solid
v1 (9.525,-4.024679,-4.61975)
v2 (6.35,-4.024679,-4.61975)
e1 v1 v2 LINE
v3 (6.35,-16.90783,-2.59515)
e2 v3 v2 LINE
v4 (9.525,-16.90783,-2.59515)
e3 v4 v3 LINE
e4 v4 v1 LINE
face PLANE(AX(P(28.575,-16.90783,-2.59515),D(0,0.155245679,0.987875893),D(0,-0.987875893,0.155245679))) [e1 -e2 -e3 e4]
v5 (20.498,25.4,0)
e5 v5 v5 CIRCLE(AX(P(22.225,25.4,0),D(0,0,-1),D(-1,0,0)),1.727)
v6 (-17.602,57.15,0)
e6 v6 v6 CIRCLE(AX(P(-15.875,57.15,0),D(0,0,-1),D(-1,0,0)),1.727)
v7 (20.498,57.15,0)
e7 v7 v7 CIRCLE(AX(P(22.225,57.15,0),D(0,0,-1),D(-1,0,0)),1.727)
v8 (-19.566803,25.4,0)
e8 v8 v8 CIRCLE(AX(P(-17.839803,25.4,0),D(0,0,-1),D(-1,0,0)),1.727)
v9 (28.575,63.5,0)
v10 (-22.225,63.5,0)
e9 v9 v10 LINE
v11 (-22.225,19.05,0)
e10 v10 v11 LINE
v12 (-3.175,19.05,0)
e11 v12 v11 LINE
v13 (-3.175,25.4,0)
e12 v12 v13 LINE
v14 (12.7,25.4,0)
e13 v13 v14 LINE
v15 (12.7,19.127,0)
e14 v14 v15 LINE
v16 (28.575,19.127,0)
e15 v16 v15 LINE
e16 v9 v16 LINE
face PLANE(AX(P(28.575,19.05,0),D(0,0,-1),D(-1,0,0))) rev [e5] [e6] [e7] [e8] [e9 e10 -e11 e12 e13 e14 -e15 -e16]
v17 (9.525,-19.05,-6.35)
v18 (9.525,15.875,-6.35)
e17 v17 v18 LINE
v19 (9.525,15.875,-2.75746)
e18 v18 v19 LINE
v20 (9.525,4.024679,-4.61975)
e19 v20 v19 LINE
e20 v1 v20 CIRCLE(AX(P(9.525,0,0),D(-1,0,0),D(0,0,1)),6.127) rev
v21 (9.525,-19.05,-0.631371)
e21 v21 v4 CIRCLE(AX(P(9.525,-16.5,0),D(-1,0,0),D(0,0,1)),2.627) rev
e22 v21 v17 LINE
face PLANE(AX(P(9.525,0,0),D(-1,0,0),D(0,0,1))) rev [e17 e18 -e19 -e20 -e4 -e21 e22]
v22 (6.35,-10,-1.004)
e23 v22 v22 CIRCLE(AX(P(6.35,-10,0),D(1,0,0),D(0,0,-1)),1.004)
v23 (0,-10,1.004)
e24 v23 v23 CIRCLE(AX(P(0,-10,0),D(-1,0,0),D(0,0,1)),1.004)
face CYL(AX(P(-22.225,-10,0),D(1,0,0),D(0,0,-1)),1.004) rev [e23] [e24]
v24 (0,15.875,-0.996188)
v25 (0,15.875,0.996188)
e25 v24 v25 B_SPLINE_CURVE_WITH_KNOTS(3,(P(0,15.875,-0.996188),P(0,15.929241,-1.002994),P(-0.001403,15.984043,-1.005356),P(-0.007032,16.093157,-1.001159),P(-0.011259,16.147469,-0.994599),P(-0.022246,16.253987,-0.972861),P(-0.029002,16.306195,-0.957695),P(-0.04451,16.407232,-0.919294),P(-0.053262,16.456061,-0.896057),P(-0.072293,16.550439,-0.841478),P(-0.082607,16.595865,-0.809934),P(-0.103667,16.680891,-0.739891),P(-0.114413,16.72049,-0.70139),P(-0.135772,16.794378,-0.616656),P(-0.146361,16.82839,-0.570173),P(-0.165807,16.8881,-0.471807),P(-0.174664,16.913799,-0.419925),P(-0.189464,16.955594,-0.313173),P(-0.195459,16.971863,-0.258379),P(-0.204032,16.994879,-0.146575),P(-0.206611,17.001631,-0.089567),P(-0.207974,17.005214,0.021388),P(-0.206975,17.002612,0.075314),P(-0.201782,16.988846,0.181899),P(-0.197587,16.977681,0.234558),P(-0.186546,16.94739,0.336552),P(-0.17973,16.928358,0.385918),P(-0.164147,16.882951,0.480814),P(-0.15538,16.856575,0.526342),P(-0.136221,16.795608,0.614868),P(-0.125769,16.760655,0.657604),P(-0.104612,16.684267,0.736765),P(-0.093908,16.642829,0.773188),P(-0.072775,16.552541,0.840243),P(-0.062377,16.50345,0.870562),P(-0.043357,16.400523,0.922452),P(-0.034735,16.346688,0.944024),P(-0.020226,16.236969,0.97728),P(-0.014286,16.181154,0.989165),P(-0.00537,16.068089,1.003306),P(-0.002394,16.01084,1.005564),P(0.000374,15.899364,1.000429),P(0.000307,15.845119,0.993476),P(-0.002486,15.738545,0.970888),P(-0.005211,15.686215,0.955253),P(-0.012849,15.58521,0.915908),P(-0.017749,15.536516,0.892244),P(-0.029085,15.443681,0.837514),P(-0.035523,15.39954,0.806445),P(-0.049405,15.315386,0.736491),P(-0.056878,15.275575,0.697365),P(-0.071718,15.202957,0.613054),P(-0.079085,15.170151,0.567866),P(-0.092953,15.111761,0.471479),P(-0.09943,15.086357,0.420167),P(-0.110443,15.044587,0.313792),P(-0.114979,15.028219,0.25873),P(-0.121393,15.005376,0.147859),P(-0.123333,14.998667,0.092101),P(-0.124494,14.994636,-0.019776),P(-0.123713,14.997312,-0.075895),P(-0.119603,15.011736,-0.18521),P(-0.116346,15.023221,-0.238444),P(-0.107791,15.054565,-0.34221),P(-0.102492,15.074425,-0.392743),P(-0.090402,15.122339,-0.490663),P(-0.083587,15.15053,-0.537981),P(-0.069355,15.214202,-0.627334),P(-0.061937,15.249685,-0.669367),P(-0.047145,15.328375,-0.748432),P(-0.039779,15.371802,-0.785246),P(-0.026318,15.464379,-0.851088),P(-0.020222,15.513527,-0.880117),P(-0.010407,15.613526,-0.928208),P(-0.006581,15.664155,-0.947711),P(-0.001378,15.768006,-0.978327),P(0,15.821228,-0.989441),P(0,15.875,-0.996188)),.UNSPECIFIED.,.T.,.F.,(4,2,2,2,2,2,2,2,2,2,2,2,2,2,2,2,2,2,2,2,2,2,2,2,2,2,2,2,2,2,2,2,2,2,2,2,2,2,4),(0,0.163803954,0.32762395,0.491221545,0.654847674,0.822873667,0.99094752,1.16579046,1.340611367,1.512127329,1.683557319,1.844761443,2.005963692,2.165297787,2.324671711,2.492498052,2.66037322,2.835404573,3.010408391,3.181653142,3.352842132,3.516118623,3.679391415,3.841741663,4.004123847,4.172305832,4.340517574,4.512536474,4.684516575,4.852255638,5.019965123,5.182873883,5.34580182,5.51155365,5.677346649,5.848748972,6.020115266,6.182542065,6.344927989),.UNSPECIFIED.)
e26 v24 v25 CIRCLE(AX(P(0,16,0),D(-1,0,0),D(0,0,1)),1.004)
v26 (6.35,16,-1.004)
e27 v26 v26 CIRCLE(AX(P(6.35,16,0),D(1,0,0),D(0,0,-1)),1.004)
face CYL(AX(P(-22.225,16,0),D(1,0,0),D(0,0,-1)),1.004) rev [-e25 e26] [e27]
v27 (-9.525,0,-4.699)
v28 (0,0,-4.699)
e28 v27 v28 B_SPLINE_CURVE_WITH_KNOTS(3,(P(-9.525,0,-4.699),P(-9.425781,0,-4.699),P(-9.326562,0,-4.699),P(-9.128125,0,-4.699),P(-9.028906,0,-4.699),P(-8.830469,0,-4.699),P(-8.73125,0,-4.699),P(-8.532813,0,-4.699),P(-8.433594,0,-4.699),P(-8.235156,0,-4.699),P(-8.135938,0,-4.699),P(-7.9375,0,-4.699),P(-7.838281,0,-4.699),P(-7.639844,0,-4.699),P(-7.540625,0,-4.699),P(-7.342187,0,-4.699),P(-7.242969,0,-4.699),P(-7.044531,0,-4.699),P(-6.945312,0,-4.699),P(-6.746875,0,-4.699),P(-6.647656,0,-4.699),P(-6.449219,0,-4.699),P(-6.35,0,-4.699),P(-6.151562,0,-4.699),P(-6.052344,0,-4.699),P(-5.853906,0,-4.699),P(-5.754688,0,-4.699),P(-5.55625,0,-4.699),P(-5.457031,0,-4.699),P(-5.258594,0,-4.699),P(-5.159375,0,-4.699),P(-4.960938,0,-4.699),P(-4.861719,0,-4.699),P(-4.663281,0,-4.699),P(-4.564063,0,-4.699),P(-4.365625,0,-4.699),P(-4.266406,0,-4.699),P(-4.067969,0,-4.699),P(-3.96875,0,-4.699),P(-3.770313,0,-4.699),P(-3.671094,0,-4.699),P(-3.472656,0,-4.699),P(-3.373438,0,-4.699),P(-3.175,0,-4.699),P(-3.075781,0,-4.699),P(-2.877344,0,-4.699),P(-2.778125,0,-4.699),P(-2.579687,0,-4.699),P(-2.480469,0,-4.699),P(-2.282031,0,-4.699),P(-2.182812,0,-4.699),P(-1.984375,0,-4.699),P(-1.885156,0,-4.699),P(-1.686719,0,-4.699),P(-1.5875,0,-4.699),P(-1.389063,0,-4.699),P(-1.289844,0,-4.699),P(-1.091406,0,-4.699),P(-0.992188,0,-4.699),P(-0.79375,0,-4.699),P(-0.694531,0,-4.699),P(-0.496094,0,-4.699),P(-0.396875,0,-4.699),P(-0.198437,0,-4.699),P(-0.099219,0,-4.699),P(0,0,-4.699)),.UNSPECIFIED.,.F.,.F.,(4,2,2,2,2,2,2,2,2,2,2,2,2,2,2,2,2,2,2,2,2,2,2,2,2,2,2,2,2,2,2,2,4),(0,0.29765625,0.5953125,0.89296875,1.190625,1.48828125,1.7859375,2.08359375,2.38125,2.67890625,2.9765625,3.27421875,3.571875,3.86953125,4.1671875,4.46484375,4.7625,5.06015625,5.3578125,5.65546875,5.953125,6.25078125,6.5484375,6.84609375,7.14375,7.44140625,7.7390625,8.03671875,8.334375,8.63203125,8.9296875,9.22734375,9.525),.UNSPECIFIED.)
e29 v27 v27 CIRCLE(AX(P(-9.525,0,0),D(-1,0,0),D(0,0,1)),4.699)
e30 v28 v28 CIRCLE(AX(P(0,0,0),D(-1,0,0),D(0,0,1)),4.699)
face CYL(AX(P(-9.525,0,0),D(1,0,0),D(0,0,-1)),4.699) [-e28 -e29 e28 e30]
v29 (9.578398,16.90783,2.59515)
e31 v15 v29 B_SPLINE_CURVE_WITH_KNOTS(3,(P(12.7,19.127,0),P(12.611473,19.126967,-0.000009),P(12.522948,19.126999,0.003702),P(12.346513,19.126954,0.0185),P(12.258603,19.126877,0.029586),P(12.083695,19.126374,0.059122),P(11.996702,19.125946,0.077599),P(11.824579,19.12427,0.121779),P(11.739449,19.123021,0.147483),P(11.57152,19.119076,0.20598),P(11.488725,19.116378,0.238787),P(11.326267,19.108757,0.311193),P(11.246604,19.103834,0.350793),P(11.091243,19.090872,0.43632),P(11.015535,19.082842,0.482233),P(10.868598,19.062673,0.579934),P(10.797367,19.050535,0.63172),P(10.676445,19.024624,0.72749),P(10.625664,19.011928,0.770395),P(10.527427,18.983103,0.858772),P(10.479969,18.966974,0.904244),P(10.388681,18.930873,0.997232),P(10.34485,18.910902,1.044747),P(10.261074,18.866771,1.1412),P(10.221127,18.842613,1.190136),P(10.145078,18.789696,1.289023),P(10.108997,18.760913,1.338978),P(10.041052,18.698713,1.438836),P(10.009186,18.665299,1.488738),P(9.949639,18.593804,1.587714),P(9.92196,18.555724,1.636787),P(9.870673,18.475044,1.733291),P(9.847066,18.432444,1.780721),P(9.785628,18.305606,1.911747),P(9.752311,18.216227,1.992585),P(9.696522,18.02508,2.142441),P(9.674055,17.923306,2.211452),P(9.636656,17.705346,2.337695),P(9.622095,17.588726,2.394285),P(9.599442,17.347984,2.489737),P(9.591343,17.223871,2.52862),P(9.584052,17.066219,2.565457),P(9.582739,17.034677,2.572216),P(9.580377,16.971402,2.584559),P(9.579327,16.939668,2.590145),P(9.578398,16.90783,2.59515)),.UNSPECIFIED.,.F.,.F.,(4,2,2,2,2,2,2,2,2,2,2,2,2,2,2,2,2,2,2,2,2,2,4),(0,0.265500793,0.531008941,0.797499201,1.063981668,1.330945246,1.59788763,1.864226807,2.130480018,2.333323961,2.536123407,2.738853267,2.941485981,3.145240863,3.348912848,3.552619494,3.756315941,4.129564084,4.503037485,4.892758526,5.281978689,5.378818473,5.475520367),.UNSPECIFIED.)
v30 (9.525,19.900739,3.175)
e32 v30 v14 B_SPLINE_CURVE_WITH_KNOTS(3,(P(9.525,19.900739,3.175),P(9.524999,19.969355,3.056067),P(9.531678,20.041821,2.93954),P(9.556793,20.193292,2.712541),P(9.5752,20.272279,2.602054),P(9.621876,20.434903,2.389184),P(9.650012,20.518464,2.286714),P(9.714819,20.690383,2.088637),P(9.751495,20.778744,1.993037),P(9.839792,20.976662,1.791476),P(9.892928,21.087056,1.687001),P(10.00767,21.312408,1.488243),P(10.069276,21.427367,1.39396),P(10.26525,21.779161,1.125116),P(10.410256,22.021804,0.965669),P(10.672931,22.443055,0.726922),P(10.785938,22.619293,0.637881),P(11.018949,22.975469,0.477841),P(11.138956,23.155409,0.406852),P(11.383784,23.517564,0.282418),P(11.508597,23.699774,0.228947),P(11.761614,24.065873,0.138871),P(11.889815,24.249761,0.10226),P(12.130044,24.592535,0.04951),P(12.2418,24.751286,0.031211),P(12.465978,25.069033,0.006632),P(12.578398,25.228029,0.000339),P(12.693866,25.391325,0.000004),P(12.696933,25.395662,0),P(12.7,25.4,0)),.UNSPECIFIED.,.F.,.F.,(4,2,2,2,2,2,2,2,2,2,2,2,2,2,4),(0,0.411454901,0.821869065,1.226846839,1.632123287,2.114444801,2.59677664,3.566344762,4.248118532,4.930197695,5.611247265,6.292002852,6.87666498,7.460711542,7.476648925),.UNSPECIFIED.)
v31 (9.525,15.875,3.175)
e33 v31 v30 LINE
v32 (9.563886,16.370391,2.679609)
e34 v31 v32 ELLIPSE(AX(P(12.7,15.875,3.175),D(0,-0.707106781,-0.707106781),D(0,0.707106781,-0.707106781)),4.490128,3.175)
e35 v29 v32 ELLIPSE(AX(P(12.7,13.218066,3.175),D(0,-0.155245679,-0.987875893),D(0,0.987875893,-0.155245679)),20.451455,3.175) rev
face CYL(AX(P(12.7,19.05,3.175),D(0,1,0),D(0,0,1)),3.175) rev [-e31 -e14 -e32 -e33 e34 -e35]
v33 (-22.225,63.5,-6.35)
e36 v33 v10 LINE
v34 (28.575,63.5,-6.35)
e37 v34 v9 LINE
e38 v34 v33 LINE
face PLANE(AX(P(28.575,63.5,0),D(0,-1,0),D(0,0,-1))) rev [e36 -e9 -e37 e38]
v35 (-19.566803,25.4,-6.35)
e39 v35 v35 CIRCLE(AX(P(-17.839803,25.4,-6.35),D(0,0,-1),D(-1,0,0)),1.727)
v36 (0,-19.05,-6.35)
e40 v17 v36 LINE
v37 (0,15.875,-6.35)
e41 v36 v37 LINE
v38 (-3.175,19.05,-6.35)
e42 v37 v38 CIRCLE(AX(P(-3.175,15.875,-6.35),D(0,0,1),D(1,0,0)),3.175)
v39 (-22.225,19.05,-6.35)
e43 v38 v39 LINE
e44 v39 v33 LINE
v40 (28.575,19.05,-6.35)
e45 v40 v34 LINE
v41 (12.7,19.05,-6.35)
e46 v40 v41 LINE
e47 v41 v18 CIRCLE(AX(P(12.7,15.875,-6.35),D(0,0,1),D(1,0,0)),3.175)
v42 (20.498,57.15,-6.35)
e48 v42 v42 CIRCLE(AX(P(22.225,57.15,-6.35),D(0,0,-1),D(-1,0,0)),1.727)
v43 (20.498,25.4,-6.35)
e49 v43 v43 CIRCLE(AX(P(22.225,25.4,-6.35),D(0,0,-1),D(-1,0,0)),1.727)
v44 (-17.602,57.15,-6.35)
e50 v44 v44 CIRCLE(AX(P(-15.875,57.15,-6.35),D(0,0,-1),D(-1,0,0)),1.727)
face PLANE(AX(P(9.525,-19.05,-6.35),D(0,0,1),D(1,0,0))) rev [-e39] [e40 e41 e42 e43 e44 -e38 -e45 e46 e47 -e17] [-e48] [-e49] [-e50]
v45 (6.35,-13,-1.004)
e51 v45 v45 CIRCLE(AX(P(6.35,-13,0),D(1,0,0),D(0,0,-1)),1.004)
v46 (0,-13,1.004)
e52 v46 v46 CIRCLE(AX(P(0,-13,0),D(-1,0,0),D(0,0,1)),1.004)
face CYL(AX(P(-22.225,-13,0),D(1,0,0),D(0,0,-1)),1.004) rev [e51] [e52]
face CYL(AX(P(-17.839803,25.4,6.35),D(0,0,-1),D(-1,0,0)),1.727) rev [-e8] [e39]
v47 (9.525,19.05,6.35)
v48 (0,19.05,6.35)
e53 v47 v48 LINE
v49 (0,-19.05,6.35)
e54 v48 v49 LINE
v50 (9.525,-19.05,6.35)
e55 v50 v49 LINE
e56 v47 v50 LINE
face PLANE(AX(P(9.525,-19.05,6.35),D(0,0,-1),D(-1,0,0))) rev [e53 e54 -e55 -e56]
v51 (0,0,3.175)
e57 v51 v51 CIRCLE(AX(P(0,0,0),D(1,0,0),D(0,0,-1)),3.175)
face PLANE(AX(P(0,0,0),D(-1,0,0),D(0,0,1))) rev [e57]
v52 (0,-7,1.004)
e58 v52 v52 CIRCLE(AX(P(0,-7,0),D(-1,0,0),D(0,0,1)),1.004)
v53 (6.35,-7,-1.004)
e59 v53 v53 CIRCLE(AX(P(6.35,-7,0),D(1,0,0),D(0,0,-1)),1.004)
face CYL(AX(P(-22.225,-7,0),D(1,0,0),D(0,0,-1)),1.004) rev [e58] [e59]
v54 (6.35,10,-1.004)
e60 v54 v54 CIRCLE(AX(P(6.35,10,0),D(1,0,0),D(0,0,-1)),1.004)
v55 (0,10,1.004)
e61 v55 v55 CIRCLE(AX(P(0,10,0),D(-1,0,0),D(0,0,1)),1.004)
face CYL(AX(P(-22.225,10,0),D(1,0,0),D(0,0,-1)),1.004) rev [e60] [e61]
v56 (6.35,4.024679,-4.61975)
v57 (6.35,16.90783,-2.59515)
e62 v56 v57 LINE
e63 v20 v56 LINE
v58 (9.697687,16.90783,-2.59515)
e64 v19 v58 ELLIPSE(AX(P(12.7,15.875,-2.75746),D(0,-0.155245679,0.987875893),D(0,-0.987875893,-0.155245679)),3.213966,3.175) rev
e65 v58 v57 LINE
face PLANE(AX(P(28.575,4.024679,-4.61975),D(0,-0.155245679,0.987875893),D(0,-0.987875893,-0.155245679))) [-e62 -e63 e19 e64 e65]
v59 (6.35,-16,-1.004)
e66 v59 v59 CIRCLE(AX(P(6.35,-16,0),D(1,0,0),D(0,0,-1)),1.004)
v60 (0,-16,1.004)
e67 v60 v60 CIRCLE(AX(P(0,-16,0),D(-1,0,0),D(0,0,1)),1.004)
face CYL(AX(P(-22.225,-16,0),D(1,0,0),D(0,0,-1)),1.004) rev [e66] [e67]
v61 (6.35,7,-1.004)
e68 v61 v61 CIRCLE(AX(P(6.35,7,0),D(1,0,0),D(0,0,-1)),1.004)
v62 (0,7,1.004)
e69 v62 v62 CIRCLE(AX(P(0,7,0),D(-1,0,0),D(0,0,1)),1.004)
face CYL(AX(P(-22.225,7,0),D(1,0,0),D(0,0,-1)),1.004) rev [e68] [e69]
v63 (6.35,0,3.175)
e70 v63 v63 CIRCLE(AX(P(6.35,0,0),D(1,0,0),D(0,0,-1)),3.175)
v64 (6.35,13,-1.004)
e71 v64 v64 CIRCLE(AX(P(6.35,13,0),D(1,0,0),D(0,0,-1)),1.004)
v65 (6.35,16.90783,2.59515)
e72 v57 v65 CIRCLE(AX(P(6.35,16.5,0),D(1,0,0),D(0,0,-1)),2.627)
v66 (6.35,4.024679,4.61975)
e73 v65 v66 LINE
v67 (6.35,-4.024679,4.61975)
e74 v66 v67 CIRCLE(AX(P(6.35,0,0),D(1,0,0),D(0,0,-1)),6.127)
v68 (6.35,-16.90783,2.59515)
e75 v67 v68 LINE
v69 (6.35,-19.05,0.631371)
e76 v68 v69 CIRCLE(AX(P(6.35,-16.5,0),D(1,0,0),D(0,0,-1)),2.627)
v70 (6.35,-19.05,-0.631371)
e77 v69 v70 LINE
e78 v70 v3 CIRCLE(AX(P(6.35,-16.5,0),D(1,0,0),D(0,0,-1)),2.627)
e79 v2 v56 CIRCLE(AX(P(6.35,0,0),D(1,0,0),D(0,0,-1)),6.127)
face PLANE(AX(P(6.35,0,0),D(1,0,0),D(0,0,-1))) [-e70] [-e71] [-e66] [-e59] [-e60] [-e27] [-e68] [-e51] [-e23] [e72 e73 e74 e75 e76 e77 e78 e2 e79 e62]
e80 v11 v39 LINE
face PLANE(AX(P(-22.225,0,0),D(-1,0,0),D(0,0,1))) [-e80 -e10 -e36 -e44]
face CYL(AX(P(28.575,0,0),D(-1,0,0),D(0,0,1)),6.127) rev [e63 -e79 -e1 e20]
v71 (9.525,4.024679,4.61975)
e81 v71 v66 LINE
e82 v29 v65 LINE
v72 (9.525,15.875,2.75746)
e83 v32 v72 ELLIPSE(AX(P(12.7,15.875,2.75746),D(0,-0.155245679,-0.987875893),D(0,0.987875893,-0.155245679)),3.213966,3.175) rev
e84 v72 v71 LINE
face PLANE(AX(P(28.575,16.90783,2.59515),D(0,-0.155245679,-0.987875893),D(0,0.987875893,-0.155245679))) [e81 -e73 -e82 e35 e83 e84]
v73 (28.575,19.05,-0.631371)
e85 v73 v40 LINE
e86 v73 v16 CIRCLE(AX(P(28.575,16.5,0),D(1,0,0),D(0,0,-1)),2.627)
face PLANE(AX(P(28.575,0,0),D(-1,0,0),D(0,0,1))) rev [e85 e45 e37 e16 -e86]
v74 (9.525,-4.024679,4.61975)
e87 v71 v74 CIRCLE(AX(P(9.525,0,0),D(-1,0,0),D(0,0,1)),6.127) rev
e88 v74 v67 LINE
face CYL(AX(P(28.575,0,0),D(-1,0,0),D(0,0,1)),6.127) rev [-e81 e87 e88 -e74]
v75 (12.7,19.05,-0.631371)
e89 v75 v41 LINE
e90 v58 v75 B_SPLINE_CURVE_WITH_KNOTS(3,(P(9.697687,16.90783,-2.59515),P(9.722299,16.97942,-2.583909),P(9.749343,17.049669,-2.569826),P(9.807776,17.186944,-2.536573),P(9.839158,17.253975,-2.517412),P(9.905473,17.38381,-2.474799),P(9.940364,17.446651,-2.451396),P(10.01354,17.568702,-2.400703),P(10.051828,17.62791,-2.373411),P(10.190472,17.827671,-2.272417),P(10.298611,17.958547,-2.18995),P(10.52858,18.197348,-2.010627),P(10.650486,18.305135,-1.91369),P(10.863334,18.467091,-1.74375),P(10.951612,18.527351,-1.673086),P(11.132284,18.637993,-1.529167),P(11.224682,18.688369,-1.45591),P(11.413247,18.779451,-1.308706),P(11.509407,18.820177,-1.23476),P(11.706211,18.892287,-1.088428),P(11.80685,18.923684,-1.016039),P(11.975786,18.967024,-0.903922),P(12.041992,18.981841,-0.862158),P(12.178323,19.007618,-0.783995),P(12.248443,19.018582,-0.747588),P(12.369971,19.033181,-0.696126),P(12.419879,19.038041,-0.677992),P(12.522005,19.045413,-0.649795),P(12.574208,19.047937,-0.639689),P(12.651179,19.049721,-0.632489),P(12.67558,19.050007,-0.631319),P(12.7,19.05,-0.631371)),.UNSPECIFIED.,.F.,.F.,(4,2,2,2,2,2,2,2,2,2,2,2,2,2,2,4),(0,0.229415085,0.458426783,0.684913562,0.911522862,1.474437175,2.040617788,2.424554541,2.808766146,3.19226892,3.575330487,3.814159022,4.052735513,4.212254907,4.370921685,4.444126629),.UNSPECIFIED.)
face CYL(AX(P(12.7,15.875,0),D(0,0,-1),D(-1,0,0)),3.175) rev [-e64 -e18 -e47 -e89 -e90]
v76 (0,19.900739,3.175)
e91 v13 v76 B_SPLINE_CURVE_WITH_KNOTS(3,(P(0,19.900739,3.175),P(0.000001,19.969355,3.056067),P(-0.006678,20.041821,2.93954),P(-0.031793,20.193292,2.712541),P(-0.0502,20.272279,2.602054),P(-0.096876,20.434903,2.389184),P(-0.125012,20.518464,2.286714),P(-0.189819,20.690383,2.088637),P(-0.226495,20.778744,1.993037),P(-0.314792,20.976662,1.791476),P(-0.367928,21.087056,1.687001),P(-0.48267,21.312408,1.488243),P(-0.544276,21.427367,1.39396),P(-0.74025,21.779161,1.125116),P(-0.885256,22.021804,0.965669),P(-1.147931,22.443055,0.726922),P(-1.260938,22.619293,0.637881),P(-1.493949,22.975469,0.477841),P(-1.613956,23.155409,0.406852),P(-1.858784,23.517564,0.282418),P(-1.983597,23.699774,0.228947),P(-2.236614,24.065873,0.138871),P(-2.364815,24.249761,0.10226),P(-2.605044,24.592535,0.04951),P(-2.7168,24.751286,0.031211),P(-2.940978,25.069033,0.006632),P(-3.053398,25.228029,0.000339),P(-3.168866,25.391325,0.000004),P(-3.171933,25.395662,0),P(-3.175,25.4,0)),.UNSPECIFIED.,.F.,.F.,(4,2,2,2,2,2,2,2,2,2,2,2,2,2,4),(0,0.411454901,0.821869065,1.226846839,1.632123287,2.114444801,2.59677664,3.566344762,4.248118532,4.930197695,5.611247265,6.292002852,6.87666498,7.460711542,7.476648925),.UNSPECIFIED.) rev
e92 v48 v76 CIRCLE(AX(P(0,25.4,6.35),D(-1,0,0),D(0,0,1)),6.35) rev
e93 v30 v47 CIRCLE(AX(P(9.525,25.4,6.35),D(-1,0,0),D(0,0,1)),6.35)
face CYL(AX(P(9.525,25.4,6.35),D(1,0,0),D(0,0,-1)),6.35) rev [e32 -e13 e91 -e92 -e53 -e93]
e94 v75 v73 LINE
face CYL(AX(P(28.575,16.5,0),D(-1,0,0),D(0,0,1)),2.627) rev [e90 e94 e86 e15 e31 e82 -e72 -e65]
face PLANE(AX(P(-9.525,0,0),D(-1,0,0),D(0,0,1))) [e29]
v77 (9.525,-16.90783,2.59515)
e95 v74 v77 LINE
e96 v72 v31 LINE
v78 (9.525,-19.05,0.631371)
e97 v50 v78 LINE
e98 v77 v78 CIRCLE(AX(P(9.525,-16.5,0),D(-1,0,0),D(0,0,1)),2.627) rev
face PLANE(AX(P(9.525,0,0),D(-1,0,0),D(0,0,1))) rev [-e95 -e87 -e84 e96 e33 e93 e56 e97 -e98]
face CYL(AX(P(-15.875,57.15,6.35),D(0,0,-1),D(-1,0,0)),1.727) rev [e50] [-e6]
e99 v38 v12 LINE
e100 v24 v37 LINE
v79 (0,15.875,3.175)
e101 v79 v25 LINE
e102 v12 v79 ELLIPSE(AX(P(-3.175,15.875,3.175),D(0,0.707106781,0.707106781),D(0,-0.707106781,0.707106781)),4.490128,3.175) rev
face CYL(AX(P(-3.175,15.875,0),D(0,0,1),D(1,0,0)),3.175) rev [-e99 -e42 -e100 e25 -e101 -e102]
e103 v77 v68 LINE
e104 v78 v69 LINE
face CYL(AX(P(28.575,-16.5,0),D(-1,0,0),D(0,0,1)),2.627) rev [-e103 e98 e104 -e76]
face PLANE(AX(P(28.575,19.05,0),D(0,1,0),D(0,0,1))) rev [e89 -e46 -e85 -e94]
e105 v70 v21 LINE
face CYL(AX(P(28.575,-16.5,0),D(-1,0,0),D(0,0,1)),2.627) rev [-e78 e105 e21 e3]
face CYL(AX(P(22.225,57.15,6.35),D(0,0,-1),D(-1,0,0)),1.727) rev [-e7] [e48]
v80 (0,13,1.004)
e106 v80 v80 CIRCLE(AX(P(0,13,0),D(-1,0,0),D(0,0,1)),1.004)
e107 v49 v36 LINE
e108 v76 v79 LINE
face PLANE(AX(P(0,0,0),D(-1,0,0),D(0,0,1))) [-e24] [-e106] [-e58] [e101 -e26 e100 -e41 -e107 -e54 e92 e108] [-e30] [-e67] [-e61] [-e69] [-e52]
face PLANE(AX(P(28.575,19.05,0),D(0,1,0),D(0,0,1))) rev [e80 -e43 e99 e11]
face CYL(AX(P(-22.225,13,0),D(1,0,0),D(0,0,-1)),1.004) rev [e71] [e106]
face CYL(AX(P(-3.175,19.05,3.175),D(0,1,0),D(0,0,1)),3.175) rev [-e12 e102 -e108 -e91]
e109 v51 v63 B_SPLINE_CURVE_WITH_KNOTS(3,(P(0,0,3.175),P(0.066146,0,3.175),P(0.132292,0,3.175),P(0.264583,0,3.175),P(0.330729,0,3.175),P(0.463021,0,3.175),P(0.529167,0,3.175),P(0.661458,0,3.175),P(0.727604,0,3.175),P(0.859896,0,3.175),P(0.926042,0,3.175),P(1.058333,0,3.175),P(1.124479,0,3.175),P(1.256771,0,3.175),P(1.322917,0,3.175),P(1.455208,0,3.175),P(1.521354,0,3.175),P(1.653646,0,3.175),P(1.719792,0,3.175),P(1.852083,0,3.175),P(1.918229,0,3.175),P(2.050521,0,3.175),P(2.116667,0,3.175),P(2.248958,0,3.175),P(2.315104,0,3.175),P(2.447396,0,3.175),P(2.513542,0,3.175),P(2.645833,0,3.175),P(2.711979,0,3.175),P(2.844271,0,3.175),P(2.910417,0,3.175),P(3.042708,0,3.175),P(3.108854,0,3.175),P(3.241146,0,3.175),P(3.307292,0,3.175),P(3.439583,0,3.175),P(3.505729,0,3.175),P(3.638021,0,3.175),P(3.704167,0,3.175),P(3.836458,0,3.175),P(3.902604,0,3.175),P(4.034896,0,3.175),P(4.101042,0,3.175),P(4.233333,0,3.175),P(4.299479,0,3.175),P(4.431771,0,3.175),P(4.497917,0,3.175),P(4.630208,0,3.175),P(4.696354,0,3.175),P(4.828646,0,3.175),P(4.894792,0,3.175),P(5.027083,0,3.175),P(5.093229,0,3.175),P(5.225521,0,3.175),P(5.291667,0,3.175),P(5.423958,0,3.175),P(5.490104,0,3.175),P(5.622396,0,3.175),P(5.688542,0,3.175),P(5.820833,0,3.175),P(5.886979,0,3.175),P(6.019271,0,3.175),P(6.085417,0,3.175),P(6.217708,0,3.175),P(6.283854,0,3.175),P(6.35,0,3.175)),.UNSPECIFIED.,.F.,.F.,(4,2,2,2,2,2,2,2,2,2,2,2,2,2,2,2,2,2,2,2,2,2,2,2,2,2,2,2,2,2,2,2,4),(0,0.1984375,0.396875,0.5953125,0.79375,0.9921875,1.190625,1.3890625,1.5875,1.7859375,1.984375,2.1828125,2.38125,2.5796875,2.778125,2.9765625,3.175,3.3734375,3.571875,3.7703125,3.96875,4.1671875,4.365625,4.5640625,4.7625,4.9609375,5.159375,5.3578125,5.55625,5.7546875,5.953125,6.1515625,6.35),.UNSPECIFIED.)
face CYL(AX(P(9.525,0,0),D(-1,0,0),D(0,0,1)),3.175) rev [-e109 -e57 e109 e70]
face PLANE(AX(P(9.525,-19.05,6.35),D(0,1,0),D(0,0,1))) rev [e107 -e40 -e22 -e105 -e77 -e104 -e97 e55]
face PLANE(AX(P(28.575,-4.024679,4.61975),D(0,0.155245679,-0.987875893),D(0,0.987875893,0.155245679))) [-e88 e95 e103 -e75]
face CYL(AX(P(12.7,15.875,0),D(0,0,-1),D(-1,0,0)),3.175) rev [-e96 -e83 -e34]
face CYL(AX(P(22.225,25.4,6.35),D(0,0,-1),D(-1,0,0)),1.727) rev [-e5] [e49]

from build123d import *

# Parameters (mm, degrees)
SKETCH2_W               = 12.7
SKETCH2_H               = 38.1
SKETCH2_R               = 3.175
BOSS_EXTRUDE1_DEPTH     = 9.525
SKETCH3_R               = 4.699
BOSS_EXTRUDE2_DEPTH     = 9.525
SKETCH6_W               = 6.35
SKETCH6_H               = 44.45
BOSS_EXTRUDE3_DEPTH     = 25.4
FILLET1_R               = 6.35
FILLET4_R               = 3.175
CUT_EXTRUDE1_DEPTH      = 72.278573361
CUT_EXTRUDE1_DEPTH_BACK = 3.175
SKETCH8_R               = 1.004
CUT_EXTRUDE2_DEPTH      = 72.278573361
SKETCH9_R               = 1.726999975
CUT_EXTRUDE3_DEPTH      = 71.781852519


with BuildPart() as part:
    # Sketch2 → Boss-Extrude1 (new body)
    with BuildSketch(Plane(origin=(0, 0, 0), x_dir=(0, 0, -1), z_dir=(1, 0, 0))):
        Rectangle(SKETCH2_W, SKETCH2_H)
        with Locations(Location((0, 0, 0), (0, 0, 180))):
            Circle(SKETCH2_R, mode=Mode.SUBTRACT)
    extrude(amount=BOSS_EXTRUDE1_DEPTH)

    # Sketch3 → Boss-Extrude2 (add)
    with BuildSketch(Plane.ZY):
        with Locations(Location((0, 0, 0), (0, 0, 180))):
            Circle(SKETCH3_R)
    extrude(amount=BOSS_EXTRUDE2_DEPTH)

    # Sketch6 → Boss-Extrude3 (add, symmetric)
    with BuildSketch(Plane(origin=(3.175, 0, 0), x_dir=(0, 0, -1), z_dir=(1, 0, 0))):
        with Locations((3.175, 41.275)):
            Rectangle(SKETCH6_W, SKETCH6_H)
    extrude(amount=BOSS_EXTRUDE3_DEPTH, both=True)

    # Fillet1
    fillet1_edges = [part.edges().sort_by_distance(p)[0] for p in [
        (4.7625, 19.05, 0),
    ]]
    fillet(fillet1_edges, radius=FILLET1_R - 0.0001)  # a hair under: the kernel refuses the full size

    # Fillet4
    fillet4_edges = [part.edges().sort_by_distance(p)[0] for p in [
        (9.525, 22.22495, 0),
        (0, 22.22495, 0),
        (0, 19.05, -3.175),
        (9.525, 19.05, -3.175),
    ]]
    fillet(fillet4_edges, radius=FILLET4_R)

    # Sketch7 → Cut-Extrude1 (cut, two sides: drawn at the far end of the back side and taken through both)
    with BuildSketch(Plane(origin=(9.525, 0, 0), x_dir=(0, 0, -1), z_dir=(1, 0, 0)).offset(-CUT_EXTRUDE1_DEPTH_BACK)):
        with BuildLine():
            Line((2.595150061, -16.907830377), (4.619750173, -4.024678621))
            ThreePointArc((4.619750173, -4.024678621), (6.127000091, 2.2e-08), (4.619750173, 4.024678665))
            Line((4.619750173, 4.024678665), (2.595150061, 16.907830421))
            ThreePointArc((2.595150061, 16.907830421), (9.1e-08, 19.127000022), (-2.595149879, 16.907830421))
            Line((-2.595149879, 16.907830421), (-4.619749991, 4.024678665))
            ThreePointArc((-4.619749991, 4.024678665), (-6.126999909, 2.2e-08), (-4.619749991, -4.024678621))
            Line((-4.619749991, -4.024678621), (-2.595149879, -16.907830377))
            ThreePointArc((-2.595149879, -16.907830377), (9.1e-08, -19.126999978), (2.595150061, -16.907830377))
        make_face()
    extrude(amount=CUT_EXTRUDE1_DEPTH + CUT_EXTRUDE1_DEPTH_BACK, mode=Mode.SUBTRACT)

    # Sketch8 → Cut-Extrude2 (cut, through all)
    with BuildSketch(Plane(origin=(9.525, 0, 0), x_dir=(0, 0, -1), z_dir=(1, 0, 0))):
        with Locations((9.1e-08, -15.999999978)):
            Circle(SKETCH8_R)
        with Locations((9.1e-08, -12.999999978)):
            Circle(SKETCH8_R)
        with Locations((9.1e-08, -9.999999978)):
            Circle(SKETCH8_R)
        with Locations((9.1e-08, -6.999999978)):
            Circle(SKETCH8_R)
        with Locations((9.1e-08, 16.000000022)):
            Circle(SKETCH8_R)
        with Locations((9.1e-08, 13.000000022)):
            Circle(SKETCH8_R)
        with Locations((9.1e-08, 10.000000022)):
            Circle(SKETCH8_R)
        with Locations((9.1e-08, 7.000000022)):
            Circle(SKETCH8_R)
    extrude(amount=-CUT_EXTRUDE2_DEPTH, mode=Mode.SUBTRACT)

    # Sketch9 → Cut-Extrude3 (cut, through all)
    with BuildSketch(Plane(origin=(0, 0, -6.35), x_dir=(-1, 0, 0), z_dir=(0, 0, -1))):
        with Locations((-22.225, 57.15)):
            Circle(SKETCH9_R)
        with Locations((15.875, 57.15)):
            Circle(SKETCH9_R)
        with Locations((17.839802872, 25.4)):
            Circle(SKETCH9_R)
        with Locations((-22.225, 25.4)):
            Circle(SKETCH9_R)
    extrude(amount=-CUT_EXTRUDE3_DEPTH, mode=Mode.SUBTRACT)


solid = part.part
